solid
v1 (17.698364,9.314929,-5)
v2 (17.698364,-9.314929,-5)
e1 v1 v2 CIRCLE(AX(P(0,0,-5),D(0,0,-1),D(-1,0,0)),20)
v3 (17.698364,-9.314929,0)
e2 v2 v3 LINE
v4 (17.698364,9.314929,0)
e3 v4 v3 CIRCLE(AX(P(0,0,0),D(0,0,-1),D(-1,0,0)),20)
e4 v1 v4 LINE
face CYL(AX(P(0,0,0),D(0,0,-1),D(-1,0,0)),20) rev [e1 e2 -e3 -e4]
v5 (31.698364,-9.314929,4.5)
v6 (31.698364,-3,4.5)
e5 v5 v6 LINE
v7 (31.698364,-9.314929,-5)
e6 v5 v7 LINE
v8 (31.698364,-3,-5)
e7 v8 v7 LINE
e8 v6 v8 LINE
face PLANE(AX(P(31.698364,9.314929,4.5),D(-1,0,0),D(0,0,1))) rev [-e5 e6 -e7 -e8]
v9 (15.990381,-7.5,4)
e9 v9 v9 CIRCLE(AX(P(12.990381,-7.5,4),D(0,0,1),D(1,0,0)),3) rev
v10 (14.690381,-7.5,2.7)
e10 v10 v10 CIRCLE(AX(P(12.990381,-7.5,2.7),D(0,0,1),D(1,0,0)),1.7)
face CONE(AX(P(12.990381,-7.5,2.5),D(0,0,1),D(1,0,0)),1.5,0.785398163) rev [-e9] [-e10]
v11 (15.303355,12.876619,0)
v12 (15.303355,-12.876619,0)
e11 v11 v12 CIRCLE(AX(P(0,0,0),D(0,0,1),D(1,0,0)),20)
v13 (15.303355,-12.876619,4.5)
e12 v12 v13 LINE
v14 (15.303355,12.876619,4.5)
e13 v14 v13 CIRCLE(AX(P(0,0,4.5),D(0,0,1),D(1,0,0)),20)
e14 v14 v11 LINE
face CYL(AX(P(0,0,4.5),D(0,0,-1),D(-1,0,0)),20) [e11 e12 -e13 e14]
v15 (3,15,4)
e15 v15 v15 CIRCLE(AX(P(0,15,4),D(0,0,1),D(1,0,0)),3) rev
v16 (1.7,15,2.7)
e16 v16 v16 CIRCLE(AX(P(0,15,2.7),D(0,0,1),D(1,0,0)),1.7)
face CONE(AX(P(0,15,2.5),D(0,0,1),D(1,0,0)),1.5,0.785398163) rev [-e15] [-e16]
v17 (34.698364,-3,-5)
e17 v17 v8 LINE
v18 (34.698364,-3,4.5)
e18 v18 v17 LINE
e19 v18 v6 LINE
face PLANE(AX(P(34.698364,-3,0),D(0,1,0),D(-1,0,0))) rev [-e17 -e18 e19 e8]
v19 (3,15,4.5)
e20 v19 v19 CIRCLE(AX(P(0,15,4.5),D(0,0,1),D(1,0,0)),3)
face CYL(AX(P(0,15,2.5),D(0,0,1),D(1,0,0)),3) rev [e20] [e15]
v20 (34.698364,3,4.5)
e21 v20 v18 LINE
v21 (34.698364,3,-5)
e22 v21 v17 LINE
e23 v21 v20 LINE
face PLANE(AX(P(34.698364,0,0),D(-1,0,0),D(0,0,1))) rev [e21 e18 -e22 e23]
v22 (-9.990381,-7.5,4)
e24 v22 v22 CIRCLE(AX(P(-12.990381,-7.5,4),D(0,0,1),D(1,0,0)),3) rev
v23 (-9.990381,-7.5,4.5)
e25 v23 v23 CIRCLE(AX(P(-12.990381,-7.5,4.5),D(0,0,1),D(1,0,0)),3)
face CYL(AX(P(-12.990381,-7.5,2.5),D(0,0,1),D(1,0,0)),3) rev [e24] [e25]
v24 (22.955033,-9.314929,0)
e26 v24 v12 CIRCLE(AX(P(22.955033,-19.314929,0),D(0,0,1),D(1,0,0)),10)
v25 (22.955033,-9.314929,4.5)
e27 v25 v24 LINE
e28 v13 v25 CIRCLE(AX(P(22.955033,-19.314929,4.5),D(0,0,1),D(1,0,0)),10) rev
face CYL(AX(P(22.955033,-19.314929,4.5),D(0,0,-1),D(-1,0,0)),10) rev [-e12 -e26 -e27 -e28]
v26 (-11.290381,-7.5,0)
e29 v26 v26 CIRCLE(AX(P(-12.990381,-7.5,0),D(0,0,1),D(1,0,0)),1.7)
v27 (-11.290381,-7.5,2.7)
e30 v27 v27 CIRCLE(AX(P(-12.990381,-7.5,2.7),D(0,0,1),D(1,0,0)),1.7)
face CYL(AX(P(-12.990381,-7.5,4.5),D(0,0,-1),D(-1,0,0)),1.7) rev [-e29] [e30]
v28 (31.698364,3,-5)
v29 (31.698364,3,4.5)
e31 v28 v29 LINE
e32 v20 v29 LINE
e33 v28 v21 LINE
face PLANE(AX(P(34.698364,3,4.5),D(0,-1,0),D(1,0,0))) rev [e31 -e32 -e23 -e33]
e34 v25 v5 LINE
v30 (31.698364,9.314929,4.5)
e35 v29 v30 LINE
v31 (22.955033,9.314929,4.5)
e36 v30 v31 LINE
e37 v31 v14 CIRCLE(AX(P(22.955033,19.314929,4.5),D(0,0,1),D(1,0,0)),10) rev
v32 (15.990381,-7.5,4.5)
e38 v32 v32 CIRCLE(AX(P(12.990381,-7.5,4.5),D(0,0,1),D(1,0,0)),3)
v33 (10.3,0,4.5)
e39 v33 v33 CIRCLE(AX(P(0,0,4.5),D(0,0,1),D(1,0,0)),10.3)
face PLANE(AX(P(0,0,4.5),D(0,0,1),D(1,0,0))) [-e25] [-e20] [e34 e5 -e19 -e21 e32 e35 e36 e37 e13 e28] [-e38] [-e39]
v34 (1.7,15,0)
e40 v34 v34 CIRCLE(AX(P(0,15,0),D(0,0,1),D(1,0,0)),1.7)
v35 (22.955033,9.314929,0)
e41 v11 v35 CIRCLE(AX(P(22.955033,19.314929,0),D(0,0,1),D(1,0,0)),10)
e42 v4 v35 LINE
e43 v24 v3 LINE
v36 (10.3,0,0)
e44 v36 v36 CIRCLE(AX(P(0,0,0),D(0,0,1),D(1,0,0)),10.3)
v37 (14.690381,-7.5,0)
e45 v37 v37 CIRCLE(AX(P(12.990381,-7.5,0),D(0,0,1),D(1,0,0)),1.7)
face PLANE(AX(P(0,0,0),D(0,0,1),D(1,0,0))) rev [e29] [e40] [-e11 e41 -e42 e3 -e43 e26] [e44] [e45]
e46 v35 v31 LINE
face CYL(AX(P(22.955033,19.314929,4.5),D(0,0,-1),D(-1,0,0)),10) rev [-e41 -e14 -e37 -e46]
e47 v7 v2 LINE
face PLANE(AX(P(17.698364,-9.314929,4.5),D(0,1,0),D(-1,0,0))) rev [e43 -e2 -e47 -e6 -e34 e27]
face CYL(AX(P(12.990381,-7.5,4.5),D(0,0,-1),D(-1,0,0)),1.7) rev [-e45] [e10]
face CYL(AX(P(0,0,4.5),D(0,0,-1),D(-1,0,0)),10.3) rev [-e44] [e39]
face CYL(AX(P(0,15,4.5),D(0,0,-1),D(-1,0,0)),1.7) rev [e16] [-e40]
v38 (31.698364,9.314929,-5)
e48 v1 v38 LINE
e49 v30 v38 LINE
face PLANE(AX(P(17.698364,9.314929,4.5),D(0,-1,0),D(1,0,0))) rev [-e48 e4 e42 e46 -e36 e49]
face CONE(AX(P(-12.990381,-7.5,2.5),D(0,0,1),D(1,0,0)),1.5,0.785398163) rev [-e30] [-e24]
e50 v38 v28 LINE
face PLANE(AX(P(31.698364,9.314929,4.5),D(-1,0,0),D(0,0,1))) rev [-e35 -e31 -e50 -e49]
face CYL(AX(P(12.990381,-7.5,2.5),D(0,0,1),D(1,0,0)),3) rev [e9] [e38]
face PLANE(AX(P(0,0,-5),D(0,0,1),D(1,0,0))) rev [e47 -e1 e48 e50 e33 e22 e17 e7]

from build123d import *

# Parameters (mm, degrees)
CROQUIS1_R              = 10.3
CROQUIS1_R_2            = 1.7
SALIENTE_EXTRUIR1_DEPTH = 4.5
CROQUIS4_R              = 3
CORTAR_EXTRUIR2_DEPTH   = 2
CHAFL_N2_SIZE           = 1.5
SALIENTE_EXTRUIR2_DEPTH = 3
SALIENTE_EXTRUIR3_DEPTH = 5
CROQUIS8_R              = 20
CORTAR_EXTRUIR3_DEPTH   = 5
REDONDEO1_R             = 10


with BuildPart() as part:
    # Croquis1 → Saliente-Extruir1 (new body)
    with BuildSketch(Plane.XY):
        with BuildLine():
            Line((17.698364448, 9.314928657), (31.698364448, 9.314928657))
            Line((31.698364448, 9.314928657), (31.698364448, -9.314928657))
            Line((31.698364448, -9.314928657), (17.698364448, -9.314928657))
            ThreePointArc((17.698364448, -9.314928657), (-20, 0), (17.698364448, 9.314928657))
        make_face()
        Circle(CROQUIS1_R, mode=Mode.SUBTRACT)
        with Locations((12.990381057, -7.5)):
            Circle(CROQUIS1_R_2, mode=Mode.SUBTRACT)
        with Locations((0, 15)):
            Circle(CROQUIS1_R_2, mode=Mode.SUBTRACT)
        with Locations((-12.990381057, -7.5)):
            Circle(CROQUIS1_R_2, mode=Mode.SUBTRACT)
    extrude(amount=SALIENTE_EXTRUIR1_DEPTH)

    # Croquis4 → Cortar-Extruir2 (cut)
    with BuildSketch(Plane.XY.offset(4.5)):
        with Locations((0, 15)):
            Circle(CROQUIS4_R)
        with Locations((12.990381057, -7.5)):
            Circle(CROQUIS4_R)
        with Locations((-12.990381057, -7.5)):
            Circle(CROQUIS4_R)
    extrude(amount=-CORTAR_EXTRUIR2_DEPTH, mode=Mode.SUBTRACT)

    # Chaflán2
    # the kernel refuses this chamfer: 1.5 mm, written as the material it adds along each edge
    with BuildSketch(Plane(origin=(12.990381057, -7.5, 2.5), x_dir=(1, 0, 0), z_dir=(0, -1, 0))) as chafl_n2_piece_1_section:
        Polygon((3, CHAFL_N2_SIZE), (3 - CHAFL_N2_SIZE, 0), (3, 0), align=None)
    chafl_n2_piece_1 = revolve(axis=Axis((12.990381057, -7.5, 2.5), (0, 0, 1)), mode=Mode.PRIVATE)
    chafl_n2_piece_1 = chafl_n2_piece_1 - Plane(origin=(12.990381057, -7.5, 3.352298642), x_dir=(1, 0, 0), z_dir=(0, 0, -1)) * Cylinder(1.7, 13, mode=Mode.PRIVATE)
    add(chafl_n2_piece_1)
    with BuildSketch(Plane(origin=(0, 15, 2.5), x_dir=(1, 0, 0), z_dir=(0, -1, 0))) as chafl_n2_piece_2_section:
        Polygon((3, CHAFL_N2_SIZE), (3 - CHAFL_N2_SIZE, 0), (3, 0), align=None)
    chafl_n2_piece_2 = revolve(axis=Axis((0, 15, 2.5), (0, 0, 1)), mode=Mode.PRIVATE)
    chafl_n2_piece_2 = chafl_n2_piece_2 - Plane(origin=(0, 15, 3.352298642), x_dir=(1, 0, 0), z_dir=(0, 0, -1)) * Cylinder(1.7, 12, mode=Mode.PRIVATE)
    add(chafl_n2_piece_2)
    with BuildSketch(Plane(origin=(-12.990381057, -7.5, 2.5), x_dir=(1, 0, 0), z_dir=(0, -1, 0))) as chafl_n2_piece_3_section:
        Polygon((3, CHAFL_N2_SIZE), (3 - CHAFL_N2_SIZE, 0), (3, 0), align=None)
    chafl_n2_piece_3 = revolve(axis=Axis((-12.990381057, -7.5, 2.5), (0, 0, 1)), mode=Mode.PRIVATE)
    chafl_n2_piece_3 = chafl_n2_piece_3 - Plane(origin=(-12.990381057, -7.5, 3.352298642), x_dir=(1, 0, 0), z_dir=(0, 0, -1)) * Cylinder(1.7, 13, mode=Mode.PRIVATE)
    add(chafl_n2_piece_3)

    # Croquis6 → Saliente-Extruir2 (add)
    with BuildSketch(Plane(origin=(31.698364448, 0, 0), x_dir=(0, 0, -1), z_dir=(1, 0, 0))):
        Polygon((-4.5, 0), (-4.5, 3), (0, 3), (0, -3), (-4.5, -3), align=None)
    extrude(amount=SALIENTE_EXTRUIR2_DEPTH)

    # Croquis7 → Saliente-Extruir3 (add)
    with BuildSketch(Plane(origin=(0, 0, 0), x_dir=(-1, 0, 0), z_dir=(0, 0, -1))):
        Polygon((-17.698364448, -9.314928657), (-31.698364448, -9.314928657), (-31.698364448, -3), (-34.698364448, -3), (-34.698364448, 3), (-31.698364448, 3), (-31.698364448, 9.314928657), (-17.698364448, 9.314928657), align=None)
    extrude(amount=SALIENTE_EXTRUIR3_DEPTH)

    # Croquis8 → Cortar-Extruir3 (cut)
    with BuildSketch(Plane(origin=(0, 0, -5), x_dir=(-1, 0, 0), z_dir=(0, 0, -1))):
        Circle(CROQUIS8_R)
    extrude(amount=-CORTAR_EXTRUIR3_DEPTH, mode=Mode.SUBTRACT)

    # Redondeo1
    # the kernel refuses this fillet: 10 mm, written as the material it adds along each edge
    with BuildSketch(Plane(origin=(17.698364448, 9.314928657, 0), x_dir=(-0.5580103389046711, 0.829833996456818, 0), z_dir=(0, 0, 1))) as redondeo1_piece_1:
        with BuildLine():
            CenterArc((5.365064674, -9.942265498), REDONDEO1_R, 96.159770197, 49.921919005)
            Line((-2.933275291, -4.362162109), (0, 0))
            ThreePointArc((0, 0), (2.14602587, -0.115469003), (4.292051739, 0))
        make_face()
    extrude(amount=4.5)
    with BuildSketch(Plane(origin=(17.698364448, -9.314928657, 0), x_dir=(1, 0, 0), z_dir=(0, 0, 1))) as redondeo1_piece_2:
        with BuildLine():
            CenterArc((5.256668355, -10), REDONDEO1_R, 90, 49.921919005)
            ThreePointArc((-2.395009246, -3.561690448), (-1.101684519, -1.845278121), (0, 0))
            Line((0, 0), (5.256668355, 0))
        make_face()
    extrude(amount=4.5)


solid = part.part
